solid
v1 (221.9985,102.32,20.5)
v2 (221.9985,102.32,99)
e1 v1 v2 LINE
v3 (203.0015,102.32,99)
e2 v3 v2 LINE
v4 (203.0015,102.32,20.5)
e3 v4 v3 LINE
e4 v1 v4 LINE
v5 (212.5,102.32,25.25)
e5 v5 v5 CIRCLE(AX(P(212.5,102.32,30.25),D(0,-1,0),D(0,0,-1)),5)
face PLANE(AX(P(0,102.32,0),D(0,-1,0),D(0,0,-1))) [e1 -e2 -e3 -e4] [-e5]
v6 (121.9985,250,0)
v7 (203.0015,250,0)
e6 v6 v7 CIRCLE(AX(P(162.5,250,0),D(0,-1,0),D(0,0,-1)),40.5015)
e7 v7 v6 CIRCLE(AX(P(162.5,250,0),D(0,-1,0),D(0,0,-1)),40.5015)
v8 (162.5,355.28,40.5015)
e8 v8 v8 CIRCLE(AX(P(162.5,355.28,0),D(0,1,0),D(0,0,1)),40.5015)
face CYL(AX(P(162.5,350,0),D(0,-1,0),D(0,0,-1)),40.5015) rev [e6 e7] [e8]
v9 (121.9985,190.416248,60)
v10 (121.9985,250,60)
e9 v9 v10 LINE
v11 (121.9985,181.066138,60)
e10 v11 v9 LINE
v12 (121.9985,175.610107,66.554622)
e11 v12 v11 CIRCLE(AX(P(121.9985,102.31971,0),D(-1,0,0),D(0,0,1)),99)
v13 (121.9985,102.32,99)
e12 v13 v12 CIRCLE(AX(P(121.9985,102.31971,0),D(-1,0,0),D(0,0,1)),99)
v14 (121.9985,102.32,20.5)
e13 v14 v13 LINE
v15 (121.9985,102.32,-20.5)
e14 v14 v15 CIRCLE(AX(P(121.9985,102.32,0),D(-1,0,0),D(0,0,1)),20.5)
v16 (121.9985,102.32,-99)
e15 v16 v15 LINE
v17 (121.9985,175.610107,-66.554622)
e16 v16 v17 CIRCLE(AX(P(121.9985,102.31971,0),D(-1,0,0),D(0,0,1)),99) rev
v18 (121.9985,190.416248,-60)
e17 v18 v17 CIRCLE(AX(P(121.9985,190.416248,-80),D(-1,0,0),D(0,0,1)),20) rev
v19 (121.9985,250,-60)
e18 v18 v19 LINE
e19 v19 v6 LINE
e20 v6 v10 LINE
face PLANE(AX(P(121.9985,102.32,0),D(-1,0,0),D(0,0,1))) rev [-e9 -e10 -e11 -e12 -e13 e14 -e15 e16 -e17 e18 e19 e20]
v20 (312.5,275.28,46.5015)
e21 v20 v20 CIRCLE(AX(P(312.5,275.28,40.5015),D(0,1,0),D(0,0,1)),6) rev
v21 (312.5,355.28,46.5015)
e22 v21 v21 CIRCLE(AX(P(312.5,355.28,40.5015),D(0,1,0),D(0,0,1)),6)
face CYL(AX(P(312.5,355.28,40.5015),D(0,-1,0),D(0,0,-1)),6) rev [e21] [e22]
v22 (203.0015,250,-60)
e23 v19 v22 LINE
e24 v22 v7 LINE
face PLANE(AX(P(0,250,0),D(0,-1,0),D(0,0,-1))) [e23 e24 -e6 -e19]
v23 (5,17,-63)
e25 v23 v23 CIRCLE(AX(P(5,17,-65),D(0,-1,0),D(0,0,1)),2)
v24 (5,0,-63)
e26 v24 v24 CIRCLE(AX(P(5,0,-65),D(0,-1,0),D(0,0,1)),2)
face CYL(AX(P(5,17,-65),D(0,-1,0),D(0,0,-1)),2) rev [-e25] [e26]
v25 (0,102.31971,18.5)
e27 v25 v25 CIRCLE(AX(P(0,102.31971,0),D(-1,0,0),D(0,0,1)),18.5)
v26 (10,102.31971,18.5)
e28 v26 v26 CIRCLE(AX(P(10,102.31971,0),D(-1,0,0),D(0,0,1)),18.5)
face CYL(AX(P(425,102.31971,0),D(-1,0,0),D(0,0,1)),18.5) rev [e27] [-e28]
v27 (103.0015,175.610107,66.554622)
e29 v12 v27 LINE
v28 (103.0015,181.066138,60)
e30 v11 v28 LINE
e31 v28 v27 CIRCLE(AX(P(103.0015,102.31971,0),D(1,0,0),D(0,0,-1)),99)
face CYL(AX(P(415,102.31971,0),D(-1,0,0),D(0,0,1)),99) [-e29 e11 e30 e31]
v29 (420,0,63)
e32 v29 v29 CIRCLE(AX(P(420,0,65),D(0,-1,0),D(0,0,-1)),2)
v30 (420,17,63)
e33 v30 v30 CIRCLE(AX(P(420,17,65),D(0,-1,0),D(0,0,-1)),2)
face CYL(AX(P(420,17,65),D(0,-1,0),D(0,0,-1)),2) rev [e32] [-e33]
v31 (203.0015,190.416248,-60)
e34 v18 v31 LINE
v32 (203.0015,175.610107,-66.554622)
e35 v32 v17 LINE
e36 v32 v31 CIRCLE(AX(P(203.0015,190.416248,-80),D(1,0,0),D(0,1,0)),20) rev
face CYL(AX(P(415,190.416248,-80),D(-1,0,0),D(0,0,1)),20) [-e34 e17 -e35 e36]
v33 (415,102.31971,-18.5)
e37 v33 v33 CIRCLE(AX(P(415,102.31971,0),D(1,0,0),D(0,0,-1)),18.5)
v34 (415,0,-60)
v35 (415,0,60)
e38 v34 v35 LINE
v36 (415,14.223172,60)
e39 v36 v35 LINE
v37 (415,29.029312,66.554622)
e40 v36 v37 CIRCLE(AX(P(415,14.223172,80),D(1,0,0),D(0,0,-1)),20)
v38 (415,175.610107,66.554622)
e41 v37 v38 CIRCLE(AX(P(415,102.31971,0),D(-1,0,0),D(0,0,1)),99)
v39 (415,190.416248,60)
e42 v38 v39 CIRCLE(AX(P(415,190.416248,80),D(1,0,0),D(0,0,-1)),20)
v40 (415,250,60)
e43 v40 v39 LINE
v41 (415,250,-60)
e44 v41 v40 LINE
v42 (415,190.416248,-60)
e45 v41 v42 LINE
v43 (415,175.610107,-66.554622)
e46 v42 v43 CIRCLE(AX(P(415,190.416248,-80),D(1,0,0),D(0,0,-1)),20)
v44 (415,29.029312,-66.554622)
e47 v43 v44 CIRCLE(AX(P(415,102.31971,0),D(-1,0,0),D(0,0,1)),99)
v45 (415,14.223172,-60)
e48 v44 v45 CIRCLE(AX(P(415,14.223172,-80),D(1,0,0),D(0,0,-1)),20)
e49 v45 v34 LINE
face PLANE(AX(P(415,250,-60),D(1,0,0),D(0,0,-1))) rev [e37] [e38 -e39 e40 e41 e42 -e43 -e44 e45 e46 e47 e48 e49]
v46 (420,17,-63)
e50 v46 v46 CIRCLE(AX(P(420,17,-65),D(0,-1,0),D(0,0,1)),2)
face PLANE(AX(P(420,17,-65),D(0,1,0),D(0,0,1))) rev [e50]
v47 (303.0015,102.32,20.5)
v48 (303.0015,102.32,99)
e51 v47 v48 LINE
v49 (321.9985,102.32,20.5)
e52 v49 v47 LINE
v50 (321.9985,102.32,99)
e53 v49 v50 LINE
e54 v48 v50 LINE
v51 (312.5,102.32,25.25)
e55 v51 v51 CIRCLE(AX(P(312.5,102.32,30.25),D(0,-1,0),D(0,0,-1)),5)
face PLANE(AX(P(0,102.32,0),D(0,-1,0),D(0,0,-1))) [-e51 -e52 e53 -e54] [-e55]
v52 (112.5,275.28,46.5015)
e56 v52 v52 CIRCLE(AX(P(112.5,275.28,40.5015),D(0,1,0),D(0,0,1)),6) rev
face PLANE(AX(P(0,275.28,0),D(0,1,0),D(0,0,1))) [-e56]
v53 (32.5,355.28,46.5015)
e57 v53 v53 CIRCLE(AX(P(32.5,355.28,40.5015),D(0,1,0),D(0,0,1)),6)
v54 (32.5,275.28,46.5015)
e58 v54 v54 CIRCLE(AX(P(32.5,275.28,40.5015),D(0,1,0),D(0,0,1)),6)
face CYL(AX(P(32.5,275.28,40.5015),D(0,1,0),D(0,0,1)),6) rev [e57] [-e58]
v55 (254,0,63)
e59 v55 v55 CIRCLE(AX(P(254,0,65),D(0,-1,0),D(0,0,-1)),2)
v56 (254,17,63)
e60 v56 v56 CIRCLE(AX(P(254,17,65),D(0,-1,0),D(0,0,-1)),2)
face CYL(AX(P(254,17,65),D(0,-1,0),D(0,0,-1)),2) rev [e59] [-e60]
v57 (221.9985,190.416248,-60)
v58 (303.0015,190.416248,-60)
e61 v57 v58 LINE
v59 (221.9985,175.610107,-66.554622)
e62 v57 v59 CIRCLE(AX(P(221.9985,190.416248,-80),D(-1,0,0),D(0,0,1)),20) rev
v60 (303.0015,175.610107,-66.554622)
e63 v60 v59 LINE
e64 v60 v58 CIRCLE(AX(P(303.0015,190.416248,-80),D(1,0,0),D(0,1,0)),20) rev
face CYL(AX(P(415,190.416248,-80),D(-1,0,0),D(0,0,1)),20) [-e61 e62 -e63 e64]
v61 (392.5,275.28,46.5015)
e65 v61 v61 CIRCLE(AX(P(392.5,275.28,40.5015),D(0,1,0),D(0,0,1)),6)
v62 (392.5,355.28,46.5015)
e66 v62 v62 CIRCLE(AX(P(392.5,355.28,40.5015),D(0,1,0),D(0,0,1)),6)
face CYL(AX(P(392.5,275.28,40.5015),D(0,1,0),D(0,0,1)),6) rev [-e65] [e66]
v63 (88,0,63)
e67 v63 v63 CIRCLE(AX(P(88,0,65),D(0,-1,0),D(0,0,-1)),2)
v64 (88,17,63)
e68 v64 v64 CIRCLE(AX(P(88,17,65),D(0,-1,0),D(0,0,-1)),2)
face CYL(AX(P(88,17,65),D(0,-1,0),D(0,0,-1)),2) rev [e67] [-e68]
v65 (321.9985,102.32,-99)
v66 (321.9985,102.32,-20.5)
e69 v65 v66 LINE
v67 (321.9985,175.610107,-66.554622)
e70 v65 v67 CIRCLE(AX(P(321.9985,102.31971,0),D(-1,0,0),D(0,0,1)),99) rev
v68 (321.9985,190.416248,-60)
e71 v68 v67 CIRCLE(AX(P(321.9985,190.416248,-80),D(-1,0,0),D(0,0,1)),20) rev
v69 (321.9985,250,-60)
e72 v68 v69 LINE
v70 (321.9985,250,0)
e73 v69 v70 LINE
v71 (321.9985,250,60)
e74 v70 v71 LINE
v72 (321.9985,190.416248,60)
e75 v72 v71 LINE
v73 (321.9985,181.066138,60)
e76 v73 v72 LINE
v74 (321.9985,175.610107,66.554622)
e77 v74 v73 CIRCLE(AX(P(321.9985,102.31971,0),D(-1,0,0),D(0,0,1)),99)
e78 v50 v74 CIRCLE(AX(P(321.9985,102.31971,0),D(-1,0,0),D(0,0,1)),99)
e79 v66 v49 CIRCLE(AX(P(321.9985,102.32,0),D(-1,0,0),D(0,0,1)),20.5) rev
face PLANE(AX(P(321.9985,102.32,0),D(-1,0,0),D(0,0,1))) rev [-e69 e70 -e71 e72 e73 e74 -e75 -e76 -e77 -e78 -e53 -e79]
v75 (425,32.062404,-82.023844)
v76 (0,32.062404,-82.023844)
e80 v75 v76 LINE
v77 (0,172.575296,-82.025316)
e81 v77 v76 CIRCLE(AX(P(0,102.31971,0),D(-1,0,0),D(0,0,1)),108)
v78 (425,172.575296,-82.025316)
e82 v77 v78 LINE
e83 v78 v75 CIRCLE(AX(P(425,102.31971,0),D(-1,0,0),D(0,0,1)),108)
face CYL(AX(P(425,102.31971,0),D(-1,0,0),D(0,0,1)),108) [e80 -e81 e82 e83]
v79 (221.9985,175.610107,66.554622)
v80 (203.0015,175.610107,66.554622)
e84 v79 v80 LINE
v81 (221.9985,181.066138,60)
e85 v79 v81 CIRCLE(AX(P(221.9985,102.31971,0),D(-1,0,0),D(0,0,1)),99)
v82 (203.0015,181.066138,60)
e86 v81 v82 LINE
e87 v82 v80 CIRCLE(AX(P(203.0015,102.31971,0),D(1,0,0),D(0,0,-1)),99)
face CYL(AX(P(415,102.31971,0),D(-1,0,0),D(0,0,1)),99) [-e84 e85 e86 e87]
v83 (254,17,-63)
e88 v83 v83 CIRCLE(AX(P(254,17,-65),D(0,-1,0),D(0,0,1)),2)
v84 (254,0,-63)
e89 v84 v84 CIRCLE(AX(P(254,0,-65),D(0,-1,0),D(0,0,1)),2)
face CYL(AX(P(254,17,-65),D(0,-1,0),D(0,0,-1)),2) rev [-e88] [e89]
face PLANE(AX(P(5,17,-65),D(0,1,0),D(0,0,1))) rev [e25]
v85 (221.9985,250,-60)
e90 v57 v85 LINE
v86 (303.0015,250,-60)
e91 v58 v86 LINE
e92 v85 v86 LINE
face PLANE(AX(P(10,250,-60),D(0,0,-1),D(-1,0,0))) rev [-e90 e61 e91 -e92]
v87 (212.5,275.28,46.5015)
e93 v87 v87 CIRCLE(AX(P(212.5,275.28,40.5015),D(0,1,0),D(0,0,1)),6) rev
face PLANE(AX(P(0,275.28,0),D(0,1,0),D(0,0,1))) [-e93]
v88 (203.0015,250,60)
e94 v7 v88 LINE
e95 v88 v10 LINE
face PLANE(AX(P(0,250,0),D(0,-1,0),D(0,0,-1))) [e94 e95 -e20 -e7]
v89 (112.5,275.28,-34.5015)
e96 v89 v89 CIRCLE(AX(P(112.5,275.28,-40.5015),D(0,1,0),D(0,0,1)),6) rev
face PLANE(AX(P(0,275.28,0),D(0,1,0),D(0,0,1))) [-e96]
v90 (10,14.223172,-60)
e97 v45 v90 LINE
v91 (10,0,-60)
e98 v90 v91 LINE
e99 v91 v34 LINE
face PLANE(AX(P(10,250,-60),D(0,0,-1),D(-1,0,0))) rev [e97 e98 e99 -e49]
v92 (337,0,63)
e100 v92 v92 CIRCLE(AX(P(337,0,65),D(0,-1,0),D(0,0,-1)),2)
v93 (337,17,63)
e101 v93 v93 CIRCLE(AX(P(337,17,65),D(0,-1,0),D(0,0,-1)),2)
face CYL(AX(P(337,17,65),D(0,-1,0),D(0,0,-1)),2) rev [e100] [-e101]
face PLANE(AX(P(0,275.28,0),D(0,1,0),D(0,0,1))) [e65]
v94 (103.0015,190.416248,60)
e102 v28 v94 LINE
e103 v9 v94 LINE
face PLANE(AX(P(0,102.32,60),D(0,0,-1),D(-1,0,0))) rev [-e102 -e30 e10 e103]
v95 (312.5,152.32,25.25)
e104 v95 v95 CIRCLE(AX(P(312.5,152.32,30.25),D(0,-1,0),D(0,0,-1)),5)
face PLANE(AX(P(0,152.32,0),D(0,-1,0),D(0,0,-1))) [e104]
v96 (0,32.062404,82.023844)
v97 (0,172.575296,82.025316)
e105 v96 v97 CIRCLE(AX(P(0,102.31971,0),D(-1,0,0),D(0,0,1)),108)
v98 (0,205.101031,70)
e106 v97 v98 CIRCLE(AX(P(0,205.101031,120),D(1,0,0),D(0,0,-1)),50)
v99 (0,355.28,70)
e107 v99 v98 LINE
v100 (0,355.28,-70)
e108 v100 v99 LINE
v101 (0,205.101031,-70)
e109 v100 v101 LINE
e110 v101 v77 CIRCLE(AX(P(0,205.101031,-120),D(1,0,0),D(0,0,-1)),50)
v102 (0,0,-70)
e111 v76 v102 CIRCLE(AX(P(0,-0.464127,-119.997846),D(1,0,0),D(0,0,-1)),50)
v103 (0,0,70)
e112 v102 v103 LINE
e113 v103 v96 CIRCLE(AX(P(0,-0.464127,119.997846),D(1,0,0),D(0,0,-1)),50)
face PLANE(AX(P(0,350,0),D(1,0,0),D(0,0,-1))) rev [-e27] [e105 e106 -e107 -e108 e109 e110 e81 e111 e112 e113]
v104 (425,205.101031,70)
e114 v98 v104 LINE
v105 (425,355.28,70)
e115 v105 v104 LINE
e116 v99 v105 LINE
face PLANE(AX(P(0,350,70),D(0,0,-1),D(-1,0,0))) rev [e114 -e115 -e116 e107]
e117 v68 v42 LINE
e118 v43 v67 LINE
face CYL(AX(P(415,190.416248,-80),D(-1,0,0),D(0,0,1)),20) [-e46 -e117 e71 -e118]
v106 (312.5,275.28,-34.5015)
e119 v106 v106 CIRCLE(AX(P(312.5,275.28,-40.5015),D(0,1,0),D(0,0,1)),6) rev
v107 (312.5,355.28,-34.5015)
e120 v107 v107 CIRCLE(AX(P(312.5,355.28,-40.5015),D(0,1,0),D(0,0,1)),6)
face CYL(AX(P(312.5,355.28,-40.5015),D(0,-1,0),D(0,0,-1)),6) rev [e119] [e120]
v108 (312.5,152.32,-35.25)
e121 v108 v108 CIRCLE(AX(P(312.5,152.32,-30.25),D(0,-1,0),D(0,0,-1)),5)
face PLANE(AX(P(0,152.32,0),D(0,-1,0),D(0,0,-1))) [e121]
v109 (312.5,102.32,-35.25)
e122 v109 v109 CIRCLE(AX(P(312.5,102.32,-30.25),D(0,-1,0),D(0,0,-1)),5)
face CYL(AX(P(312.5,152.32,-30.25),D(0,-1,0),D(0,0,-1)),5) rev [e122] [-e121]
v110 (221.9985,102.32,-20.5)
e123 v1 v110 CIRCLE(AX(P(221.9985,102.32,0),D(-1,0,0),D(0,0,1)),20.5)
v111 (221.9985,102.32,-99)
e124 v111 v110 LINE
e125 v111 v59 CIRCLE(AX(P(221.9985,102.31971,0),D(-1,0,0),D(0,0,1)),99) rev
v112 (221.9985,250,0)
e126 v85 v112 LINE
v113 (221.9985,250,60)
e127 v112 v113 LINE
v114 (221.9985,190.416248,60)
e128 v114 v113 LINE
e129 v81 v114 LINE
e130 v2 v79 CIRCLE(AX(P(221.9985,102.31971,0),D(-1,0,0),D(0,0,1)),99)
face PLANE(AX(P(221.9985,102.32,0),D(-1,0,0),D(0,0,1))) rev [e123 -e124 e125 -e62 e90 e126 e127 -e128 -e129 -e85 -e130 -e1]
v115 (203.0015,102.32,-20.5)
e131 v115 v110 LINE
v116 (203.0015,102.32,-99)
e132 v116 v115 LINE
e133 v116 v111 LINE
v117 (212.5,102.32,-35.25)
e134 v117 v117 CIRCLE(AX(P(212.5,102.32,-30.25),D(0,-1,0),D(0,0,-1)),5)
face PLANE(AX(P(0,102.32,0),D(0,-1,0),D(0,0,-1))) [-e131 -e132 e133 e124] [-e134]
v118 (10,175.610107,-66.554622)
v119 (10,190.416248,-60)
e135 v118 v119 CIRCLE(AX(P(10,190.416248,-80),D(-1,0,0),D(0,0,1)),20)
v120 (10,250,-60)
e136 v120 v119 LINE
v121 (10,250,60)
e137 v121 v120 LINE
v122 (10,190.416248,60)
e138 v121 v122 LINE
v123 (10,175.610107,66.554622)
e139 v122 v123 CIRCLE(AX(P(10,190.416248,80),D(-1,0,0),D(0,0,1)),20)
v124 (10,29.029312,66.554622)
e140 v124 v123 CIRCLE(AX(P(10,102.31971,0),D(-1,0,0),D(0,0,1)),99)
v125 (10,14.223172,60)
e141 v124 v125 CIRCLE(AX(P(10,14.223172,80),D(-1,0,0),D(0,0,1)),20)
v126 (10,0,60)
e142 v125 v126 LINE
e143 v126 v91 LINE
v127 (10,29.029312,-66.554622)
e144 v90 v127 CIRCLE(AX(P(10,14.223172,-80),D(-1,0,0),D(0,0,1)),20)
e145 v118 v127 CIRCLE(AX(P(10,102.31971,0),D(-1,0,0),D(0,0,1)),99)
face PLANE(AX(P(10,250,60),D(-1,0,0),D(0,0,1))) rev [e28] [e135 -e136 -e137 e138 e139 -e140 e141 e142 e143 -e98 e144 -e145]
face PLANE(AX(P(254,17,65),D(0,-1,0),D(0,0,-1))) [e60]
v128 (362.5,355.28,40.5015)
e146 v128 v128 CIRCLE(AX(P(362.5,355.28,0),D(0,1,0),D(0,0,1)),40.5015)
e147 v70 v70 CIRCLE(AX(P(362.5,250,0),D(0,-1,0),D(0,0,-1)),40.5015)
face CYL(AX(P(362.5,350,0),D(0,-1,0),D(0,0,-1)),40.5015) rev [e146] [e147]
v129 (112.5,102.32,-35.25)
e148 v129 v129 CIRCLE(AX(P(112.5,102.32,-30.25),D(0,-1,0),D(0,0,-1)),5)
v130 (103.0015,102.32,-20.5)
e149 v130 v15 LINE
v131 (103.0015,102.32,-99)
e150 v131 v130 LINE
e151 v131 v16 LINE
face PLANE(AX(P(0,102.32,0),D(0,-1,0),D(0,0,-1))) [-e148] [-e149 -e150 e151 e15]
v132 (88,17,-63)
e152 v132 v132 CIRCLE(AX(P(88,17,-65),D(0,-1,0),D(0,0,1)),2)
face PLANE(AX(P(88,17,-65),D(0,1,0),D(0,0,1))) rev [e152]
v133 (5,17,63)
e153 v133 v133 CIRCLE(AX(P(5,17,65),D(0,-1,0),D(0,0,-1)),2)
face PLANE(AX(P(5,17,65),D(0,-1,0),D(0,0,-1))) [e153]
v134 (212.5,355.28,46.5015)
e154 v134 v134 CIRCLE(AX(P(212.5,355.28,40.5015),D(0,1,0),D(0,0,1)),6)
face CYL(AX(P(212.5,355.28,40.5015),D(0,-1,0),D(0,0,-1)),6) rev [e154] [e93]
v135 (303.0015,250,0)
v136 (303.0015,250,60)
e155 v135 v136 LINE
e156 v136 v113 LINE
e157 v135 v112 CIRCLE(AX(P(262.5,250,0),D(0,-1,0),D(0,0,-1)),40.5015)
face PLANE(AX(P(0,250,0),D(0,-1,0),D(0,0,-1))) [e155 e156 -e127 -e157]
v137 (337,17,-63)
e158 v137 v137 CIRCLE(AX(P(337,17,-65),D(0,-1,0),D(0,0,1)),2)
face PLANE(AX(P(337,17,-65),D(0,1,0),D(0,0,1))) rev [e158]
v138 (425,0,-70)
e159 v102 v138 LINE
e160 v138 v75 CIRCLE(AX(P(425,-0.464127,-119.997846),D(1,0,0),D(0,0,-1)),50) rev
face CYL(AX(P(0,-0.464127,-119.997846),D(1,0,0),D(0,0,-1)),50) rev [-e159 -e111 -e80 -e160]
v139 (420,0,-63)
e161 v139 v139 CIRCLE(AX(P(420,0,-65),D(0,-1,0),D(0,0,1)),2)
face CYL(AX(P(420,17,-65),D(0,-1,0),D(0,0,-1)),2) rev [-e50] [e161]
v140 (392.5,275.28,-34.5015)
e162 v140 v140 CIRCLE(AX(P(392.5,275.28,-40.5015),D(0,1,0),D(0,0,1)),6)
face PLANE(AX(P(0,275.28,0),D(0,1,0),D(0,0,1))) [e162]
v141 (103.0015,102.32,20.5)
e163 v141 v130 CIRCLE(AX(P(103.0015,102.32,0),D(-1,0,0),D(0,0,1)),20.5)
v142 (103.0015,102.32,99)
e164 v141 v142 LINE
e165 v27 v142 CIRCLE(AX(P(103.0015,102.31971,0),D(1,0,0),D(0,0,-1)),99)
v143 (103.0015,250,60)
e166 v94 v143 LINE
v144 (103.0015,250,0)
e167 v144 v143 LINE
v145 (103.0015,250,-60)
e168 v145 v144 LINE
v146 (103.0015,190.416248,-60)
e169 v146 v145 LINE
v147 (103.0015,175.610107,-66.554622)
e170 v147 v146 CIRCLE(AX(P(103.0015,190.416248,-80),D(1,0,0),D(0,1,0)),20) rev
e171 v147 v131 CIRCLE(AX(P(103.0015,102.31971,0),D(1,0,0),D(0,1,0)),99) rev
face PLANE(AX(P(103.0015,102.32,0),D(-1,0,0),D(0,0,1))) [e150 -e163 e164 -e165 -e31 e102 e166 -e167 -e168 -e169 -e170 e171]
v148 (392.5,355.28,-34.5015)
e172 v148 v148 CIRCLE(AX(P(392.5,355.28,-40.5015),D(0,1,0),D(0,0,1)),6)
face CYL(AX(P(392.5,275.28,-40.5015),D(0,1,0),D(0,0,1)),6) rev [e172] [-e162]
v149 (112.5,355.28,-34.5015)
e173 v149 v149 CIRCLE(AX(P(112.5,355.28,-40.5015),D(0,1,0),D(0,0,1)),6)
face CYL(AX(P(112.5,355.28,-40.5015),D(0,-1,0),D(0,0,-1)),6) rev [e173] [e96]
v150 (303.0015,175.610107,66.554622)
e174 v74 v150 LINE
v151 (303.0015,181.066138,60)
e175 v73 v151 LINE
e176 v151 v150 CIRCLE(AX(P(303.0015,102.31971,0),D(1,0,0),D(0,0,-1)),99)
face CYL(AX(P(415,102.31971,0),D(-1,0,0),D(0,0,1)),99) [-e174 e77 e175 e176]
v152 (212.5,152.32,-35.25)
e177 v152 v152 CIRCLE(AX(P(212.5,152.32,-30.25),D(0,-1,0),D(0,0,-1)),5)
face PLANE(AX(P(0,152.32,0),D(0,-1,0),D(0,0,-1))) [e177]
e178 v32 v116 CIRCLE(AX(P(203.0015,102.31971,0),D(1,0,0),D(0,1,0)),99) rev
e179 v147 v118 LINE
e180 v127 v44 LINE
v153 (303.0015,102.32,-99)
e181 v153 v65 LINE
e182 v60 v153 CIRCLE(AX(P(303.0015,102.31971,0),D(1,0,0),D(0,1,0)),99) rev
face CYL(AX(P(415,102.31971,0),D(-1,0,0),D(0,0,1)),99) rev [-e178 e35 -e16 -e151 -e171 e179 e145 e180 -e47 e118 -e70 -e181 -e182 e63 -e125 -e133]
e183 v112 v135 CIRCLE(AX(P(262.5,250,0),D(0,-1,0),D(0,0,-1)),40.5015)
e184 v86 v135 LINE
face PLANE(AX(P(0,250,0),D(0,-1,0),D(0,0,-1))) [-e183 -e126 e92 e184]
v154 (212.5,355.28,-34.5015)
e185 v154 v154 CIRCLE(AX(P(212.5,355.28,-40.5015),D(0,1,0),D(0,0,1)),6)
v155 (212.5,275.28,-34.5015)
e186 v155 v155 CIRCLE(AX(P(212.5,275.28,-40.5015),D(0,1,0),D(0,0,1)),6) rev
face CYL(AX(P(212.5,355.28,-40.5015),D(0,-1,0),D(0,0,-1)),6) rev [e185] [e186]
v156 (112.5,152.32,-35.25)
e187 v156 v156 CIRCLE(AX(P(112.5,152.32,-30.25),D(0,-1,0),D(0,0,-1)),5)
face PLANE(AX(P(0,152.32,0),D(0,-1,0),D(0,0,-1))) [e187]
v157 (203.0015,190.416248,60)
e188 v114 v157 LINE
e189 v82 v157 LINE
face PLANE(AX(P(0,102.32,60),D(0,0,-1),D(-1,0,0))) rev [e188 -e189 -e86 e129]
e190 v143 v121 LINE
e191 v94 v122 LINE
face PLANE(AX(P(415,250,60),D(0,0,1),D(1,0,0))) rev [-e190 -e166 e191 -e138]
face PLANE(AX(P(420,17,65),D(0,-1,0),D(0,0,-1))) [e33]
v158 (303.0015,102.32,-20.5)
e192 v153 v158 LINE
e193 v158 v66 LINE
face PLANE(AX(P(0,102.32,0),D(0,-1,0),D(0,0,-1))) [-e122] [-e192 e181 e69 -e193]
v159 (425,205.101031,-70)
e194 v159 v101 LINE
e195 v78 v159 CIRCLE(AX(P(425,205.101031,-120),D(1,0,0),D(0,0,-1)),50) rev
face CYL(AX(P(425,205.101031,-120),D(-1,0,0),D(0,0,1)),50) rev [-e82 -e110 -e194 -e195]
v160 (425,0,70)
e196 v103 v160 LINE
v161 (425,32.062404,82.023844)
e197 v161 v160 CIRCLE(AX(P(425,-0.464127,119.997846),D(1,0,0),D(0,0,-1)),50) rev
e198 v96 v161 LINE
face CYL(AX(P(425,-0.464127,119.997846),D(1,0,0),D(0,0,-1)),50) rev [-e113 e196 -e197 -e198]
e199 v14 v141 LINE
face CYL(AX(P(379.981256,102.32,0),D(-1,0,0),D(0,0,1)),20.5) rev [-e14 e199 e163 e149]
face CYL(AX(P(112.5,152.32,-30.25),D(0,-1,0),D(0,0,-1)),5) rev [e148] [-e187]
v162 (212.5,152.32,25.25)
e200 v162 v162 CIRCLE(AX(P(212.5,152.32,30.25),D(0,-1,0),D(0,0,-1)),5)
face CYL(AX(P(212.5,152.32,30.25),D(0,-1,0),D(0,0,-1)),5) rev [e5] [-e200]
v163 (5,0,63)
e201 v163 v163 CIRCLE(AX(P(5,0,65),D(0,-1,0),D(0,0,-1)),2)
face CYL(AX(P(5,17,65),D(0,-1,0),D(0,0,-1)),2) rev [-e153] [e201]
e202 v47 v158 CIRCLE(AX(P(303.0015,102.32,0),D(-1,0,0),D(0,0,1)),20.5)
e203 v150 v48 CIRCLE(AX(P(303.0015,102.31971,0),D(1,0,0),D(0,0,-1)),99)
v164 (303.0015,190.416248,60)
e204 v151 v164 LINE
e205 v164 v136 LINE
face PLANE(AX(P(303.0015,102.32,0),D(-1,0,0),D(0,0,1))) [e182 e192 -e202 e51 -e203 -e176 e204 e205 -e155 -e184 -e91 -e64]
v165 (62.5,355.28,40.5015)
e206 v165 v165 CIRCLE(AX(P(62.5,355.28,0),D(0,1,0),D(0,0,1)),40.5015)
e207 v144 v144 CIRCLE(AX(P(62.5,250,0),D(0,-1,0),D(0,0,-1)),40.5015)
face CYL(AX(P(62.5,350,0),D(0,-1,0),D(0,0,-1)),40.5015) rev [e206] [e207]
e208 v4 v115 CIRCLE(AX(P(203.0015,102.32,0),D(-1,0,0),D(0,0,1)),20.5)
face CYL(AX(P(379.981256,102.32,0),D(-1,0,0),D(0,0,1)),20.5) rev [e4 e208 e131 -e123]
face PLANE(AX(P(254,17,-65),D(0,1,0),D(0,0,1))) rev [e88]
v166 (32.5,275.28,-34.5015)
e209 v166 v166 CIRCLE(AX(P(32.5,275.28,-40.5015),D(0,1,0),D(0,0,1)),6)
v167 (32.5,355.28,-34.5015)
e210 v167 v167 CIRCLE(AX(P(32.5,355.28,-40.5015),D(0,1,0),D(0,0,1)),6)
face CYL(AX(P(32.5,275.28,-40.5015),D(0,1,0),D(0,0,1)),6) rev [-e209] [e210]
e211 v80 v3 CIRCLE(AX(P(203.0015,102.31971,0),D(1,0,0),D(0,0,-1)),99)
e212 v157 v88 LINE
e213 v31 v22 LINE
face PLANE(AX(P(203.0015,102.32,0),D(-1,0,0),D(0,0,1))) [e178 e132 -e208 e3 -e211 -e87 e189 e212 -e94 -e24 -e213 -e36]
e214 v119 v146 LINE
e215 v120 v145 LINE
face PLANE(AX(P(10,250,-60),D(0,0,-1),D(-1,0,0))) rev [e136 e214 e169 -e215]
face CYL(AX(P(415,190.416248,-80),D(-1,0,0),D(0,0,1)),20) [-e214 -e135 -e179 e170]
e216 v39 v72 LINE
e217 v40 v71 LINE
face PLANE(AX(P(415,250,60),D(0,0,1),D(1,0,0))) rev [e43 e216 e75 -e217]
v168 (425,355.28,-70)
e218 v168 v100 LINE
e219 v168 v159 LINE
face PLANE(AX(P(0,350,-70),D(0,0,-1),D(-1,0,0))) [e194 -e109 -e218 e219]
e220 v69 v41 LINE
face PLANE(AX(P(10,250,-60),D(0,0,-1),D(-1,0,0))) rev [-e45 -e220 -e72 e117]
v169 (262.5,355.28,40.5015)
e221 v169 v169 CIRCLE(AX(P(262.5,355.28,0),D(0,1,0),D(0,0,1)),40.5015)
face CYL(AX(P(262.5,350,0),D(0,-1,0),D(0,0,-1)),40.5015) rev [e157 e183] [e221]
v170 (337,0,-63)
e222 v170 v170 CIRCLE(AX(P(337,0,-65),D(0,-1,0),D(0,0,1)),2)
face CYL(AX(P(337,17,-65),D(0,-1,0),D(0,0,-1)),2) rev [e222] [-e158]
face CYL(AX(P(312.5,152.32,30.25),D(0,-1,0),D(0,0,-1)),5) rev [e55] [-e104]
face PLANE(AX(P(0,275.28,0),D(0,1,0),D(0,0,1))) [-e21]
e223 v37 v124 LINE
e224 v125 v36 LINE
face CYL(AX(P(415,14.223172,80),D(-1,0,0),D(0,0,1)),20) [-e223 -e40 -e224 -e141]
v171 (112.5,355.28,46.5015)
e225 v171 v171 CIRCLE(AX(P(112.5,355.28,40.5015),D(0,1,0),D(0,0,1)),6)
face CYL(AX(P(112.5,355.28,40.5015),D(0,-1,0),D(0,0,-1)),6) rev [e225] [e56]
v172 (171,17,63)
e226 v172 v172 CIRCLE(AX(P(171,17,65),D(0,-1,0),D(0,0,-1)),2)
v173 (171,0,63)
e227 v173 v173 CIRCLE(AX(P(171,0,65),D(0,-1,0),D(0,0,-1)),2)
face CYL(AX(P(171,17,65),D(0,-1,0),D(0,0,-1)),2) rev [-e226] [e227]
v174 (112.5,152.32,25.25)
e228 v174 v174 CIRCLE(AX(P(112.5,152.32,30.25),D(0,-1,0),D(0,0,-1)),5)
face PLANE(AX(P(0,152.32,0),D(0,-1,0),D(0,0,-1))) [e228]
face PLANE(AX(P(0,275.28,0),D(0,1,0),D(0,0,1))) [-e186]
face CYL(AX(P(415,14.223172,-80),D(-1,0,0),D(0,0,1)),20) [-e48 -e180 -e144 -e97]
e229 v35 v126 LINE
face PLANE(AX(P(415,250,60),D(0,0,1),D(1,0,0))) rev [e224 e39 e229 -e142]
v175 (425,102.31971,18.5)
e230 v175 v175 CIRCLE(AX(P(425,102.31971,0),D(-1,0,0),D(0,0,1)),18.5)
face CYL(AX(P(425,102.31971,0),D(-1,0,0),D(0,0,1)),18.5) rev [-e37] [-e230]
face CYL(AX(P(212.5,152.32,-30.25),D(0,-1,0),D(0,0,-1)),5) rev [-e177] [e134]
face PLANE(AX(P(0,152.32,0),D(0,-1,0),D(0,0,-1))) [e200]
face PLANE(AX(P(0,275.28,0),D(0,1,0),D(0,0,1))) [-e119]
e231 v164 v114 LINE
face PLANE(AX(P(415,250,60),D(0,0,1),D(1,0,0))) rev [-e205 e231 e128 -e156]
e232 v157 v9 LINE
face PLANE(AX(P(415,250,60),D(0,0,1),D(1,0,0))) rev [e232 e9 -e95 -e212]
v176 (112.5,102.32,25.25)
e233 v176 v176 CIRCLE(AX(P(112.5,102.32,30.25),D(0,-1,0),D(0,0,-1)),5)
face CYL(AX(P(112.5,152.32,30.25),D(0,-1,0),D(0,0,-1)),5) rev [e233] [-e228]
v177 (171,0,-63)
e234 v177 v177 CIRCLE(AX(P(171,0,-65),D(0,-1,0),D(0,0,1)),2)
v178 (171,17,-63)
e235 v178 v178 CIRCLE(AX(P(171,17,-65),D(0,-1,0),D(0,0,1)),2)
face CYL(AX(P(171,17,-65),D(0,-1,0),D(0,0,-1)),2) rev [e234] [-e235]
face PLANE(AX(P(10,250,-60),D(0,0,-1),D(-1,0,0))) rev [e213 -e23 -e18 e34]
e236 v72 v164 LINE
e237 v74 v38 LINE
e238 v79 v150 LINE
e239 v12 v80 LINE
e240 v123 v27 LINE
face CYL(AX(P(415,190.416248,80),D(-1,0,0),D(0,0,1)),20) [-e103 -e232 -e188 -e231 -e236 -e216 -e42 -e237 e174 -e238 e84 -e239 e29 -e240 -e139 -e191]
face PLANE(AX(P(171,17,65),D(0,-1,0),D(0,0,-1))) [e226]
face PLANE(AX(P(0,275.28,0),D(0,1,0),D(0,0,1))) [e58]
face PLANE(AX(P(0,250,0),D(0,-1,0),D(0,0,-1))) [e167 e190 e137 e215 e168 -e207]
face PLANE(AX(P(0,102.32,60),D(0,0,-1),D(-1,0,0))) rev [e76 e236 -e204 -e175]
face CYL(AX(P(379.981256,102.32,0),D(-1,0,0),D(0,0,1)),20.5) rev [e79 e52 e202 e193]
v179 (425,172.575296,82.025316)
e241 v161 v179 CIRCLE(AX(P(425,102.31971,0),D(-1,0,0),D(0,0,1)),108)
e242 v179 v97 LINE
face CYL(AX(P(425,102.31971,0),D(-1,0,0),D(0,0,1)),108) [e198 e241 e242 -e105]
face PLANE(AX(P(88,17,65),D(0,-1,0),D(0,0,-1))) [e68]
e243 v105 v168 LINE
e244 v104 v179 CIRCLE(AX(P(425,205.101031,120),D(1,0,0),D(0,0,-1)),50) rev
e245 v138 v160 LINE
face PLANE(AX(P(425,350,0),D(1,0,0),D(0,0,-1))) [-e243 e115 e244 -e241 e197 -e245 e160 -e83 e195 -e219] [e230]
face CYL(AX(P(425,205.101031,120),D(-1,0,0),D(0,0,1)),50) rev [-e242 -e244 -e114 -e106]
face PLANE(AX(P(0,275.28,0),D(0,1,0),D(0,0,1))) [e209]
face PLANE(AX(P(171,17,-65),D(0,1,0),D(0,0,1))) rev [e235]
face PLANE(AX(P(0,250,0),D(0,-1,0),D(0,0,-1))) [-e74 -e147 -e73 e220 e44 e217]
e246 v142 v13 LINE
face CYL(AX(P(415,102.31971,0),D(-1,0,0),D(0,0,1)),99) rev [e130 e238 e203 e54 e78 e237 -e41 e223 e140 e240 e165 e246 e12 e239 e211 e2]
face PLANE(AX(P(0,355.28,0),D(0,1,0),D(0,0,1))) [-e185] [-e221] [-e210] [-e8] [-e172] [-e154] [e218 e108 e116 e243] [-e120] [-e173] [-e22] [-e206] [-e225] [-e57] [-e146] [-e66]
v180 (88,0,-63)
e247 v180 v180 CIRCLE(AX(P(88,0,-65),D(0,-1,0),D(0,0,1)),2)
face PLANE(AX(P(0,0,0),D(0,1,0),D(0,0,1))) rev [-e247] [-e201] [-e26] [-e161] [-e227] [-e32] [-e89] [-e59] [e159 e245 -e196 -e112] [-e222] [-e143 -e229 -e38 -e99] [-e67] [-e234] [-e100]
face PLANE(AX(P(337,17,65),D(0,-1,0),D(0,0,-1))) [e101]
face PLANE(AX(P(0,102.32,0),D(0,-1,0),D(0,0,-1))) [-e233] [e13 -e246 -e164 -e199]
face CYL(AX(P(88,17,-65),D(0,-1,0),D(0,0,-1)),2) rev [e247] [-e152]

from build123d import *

# Parameters (mm, degrees)
BOSS_EXTRUDE1_DEPTH    = 350
SKETCH2_W              = 405
SKETCH2_H              = 120
CUT_EXTRUDE1_DEPTH     = 250
SKETCH3_R              = 18.5
CUT_EXTRUDE2_DEPTH     = 425
BOSS_EXTRUDE4_DEPTH    = 425
SKETCH7_R              = 99
CUT_EXTRUDE4_DEPTH     = 405
FILLET1_R              = 20
FILLET2_R              = 50
SKETCH8_W              = 425
SKETCH8_H              = 140
SKETCH8_R              = 6
SKETCH8_R_2            = 40.5015
BOSS_EXTRUDE5_DEPTH    = 5.28
CUT_EXTRUDE5_START     = -80
CUT_EXTRUDE5_OUTLINE_R = 6
CUT_EXTRUDE5_DEPTH     = 80
BOSS_EXTRUDE8_START    = -5.28
SKETCH10_R             = 6
BOSS_EXTRUDE8_DEPTH    = 5.28
SKETCH13_W             = 18.997
SKETCH13_H             = 60
BOSS_EXTRUDE9_DEPTH    = 147.68
CUT_EXTRUDE6_REACH     = 493.499
SKETCH14_R             = 20.5
SKETCH15_R             = 5
CUT_EXTRUDE7_DEPTH     = 50
BOSS_EXTRUDE10_START   = 103.0015
BOSS_EXTRUDE10_DEPTH   = 18.997
BOSS_EXTRUDE10_START_2 = 203.0015
BOSS_EXTRUDE10_2_DEPTH = 18.997
BOSS_EXTRUDE10_START_3 = 303.0015
BOSS_EXTRUDE10_3_DEPTH = 18.997
SKETCH17_W             = 18.997
SKETCH17_H             = 88.096247543
BOSS_EXTRUDE11_DEPTH   = 78
CUT_EXTRUDE8_START     = -425
CUT_EXTRUDE8_DEPTH     = 425
SKETCH19_R             = 2
CUT_EXTRUDE9_DEPTH     = 17


# Read off the part's stored shape, not the designer's step: Cut-Extrude5, Boss-Extrude10
with BuildPart() as part:
    # Sketch1 → Boss-Extrude1 (new body)
    with BuildSketch(Plane(origin=(0, 0, 0), x_dir=(1, 0, 0), z_dir=(0, 1, 0))):
        with BuildLine():
            Line((21.9985, 0), (0, 0))
            Line((0, 0), (0, -70))
            Line((0, -70), (425, -70))
            Line((425, -70), (425, 0))
            Line((425, 0), (403.0015, 0))
            ThreePointArc((403.0015, 0), (362.5, -40.5015), (321.9985, 0))
            Line((321.9985, 0), (303.0015, 0))
            ThreePointArc((303.0015, 0), (262.5, -40.5015), (221.9985, 0))
            Line((221.9985, 0), (203.0015, 0))
            ThreePointArc((203.0015, 0), (162.5, -40.5015), (121.9985, 0))
            Line((121.9985, 0), (103.0015, 0))
            ThreePointArc((103.0015, 0), (62.5, -40.5015), (21.9985, 0))
        make_face()
        with BuildLine():
            Line((0, 70), (0, 0))
            Line((0, 0), (21.9985, 0))
            ThreePointArc((21.9985, 0), (62.5, 40.5015), (103.0015, 0))
            Line((103.0015, 0), (121.9985, 0))
            ThreePointArc((121.9985, 0), (162.5, 40.5015), (203.0015, 0))
            Line((203.0015, 0), (221.9985, 0))
            ThreePointArc((221.9985, 0), (262.5, 40.5015), (303.0015, 0))
            Line((303.0015, 0), (321.9985, 0))
            ThreePointArc((321.9985, 0), (362.5, 40.5015), (403.0015, 0))
            Line((403.0015, 0), (425, 0))
            Line((425, 0), (425, 70))
            Line((425, 70), (0, 70))
        make_face()
    extrude(amount=BOSS_EXTRUDE1_DEPTH)

    # Sketch2 → Cut-Extrude1 (cut)
    with BuildSketch(Plane.XZ):
        with Locations((212.5, 0)):
            Rectangle(SKETCH2_W, SKETCH2_H)
    extrude(amount=-CUT_EXTRUDE1_DEPTH, mode=Mode.SUBTRACT)

    # Sketch3 → Cut-Extrude2 (cut)
    with BuildSketch(Plane.ZY):
        with Locations((0, 102.319709586)):
            Circle(SKETCH3_R)
    extrude(amount=-CUT_EXTRUDE2_DEPTH, mode=Mode.SUBTRACT)

    # Sketch5 → Boss-Extrude4 (add)
    with BuildSketch(Plane.ZY):
        with BuildLine():
            Line((-70, 20.076168806), (-70, 184.563250366))
            ThreePointArc((-70, 184.563250366), (-108, 102.319709586), (-70, 20.076168806))
        make_face()
        with BuildLine():
            ThreePointArc((70, 20.076168806), (108, 102.319709586), (70, 184.563250366))
            Line((70, 184.563250366), (70, 20.076168806))
        make_face()
    extrude(amount=-BOSS_EXTRUDE4_DEPTH)

    # Sketch7 → Cut-Extrude4 (cut)
    with BuildSketch(Plane.ZY.offset(-10)):
        with Locations((0, 102.319709586)):
            Circle(SKETCH7_R)
    extrude(amount=-CUT_EXTRUDE4_DEPTH, mode=Mode.SUBTRACT)

    # Fillet1
    fillet1_edges = [part.edges().sort_by_distance(p)[0] for p in [
        (212.5, 23.573281096, -60),
        (212.5, 181.066138077, -60),
        (212.5, 181.066138077, 60),
        (212.5, 23.573281096, 60),
    ]]
    fillet(fillet1_edges, radius=FILLET1_R)

    # Fillet2
    # the kernel refuses this fillet: 50 mm, written as the material it adds along each edge
    with BuildSketch(Plane(origin=(0, 184.563250366, -70), x_dir=(0, -0.7060057358717271, -0.7082061147125328), z_dir=(1, 0, 0))) as fillet2_piece_1:
        with BuildLine():
            CenterArc((20.910514914, 49.845268512), FILLET2_R, 224.9108533, 40.580418656)
            Line((-14.499790821, 14.544981719), (-15.207996936, 13.838975983))
            Line((-15.207996936, 13.838975983), (-0.708206115, -0.706005736))
            Line((-0.708206115, -0.706005736), (0.078610958, -0.99690537))
            ThreePointArc((0.078610958, -0.99690537), (8.489983499, -0.665779987), (16.90135604, -0.99690537))
            Line((16.90135604, -0.99690537), (16.979966998, 0))
        make_face()
    extrude(amount=425)
    with BuildSketch(Plane(origin=(0, 20.076168806, -70), x_dir=(0, -1, 0), z_dir=(1, 0, 0))) as fillet2_piece_2:
        with BuildLine():
            CenterArc((20.540295494, 49.997845818), FILLET2_R, 229.418380503, 40.049761852)
            Line((-11.986234973, 12.023843977), (-12.636765582, 11.26436394))
            ThreePointArc((-12.636765582, 11.26436394), (-6.464694875, 5.541819632), (-0.761514266, -0.648148148))
            Line((-0.761514266, -0.648148148), (0, -1))
            ThreePointArc((0, -1), (10.038084403, -1), (20.066886273, -0.999956916))
            Line((20.066886273, -0.999956916), (20.076168806, 0))
        make_face()
    extrude(amount=425)
    with BuildSketch(Plane(origin=(0, 20.076168806, 70), x_dir=(0, -1, 0), z_dir=(1, 0, 0))) as fillet2_piece_3:
        with BuildLine():
            CenterArc((20.540295494, -49.997845818), FILLET2_R, 90.531857645, 40.049761852)
            Line((-11.986234973, -12.023843977), (-12.636765582, -11.26436394))
            ThreePointArc((-12.636765582, -11.26436394), (-6.464694875, -5.541819632), (-0.761514266, 0.648148148))
            Line((-0.761514266, 0.648148148), (0, 1))
            ThreePointArc((0, 1), (10.038084403, 1), (20.066886273, 0.999956916))
            Line((20.066886273, 0.999956916), (20.076168806, 0))
        make_face()
    extrude(amount=425)
    with BuildSketch(Plane(origin=(0, 184.563250366, 70), x_dir=(0, 1, 0), z_dir=(1, 0, 0))) as fillet2_piece_4:
        with BuildLine():
            CenterArc((20.53778048, 50), FILLET2_R, 229.419581344, 40.580418656)
            Line((-11.987954096, 12.025316456), (-12.638468787, 11.265822785))
            ThreePointArc((-12.638468787, 11.265822785), (-6.465486506, 5.542613738), (-0.761514266, -0.648148148))
            Line((-0.761514266, -0.648148148), (0, -1))
            Line((0, -1), (20.53778048, -1))
            Line((20.53778048, -1), (20.53778048, 0))
        make_face()
    extrude(amount=425)

    # Sketch8 → Boss-Extrude5 (add)
    with BuildSketch(Plane(origin=(0, 350, 0), x_dir=(1, 0, 0), z_dir=(0, 1, 0))):
        with Locations((212.5, 0)):
            Rectangle(SKETCH8_W, SKETCH8_H)
        with Locations(Location((112.5, 40.5015, 0), (0, 0, 270))):
            Circle(SKETCH8_R, mode=Mode.SUBTRACT)
        with Locations(Location((112.5, -40.5015, 0), (0, 0, 270))):
            Circle(SKETCH8_R, mode=Mode.SUBTRACT)
        with Locations(Location((212.5, -40.5015, 0), (0, 0, 270))):
            Circle(SKETCH8_R, mode=Mode.SUBTRACT)
        with Locations(Location((212.5, 40.5015, 0), (0, 0, 270))):
            Circle(SKETCH8_R, mode=Mode.SUBTRACT)
        with Locations(Location((312.5, -40.5015, 0), (0, 0, 270))):
            Circle(SKETCH8_R, mode=Mode.SUBTRACT)
        with Locations(Location((312.5, 40.5015, 0), (0, 0, 270))):
            Circle(SKETCH8_R, mode=Mode.SUBTRACT)
        with Locations(Location((12.5, 40.5015, 0), (0, 0, 270))):
            Circle(SKETCH8_R, mode=Mode.SUBTRACT)
        with Locations(Location((12.5, -40.5015, 0), (0, 0, 270))):
            Circle(SKETCH8_R, mode=Mode.SUBTRACT)
        with Locations(Location((412.5, -40.5015, 0), (0, 0, 270))):
            Circle(SKETCH8_R, mode=Mode.SUBTRACT)
        with Locations(Location((412.5, 40.5015, 0), (0, 0, 270))):
            Circle(SKETCH8_R, mode=Mode.SUBTRACT)
        with Locations(Location((62.5, 0, 0), (0, 0, 90))):
            Circle(SKETCH8_R_2, mode=Mode.SUBTRACT)
        with Locations(Location((162.5, 0, 0), (0, 0, 90))):
            Circle(SKETCH8_R_2, mode=Mode.SUBTRACT)
        with Locations(Location((262.5, 0, 0), (0, 0, 90))):
            Circle(SKETCH8_R_2, mode=Mode.SUBTRACT)
        with Locations(Location((362.5, 0, 0), (0, 0, 90))):
            Circle(SKETCH8_R_2, mode=Mode.SUBTRACT)
    extrude(amount=BOSS_EXTRUDE5_DEPTH)

    # Cut-Extrude5 outline → Cut-Extrude5 (cut)
    with BuildSketch(Plane(origin=(0, 355.28, 0), x_dir=(1, 0, 0), z_dir=(0, 1, 0)).offset(CUT_EXTRUDE5_START)):
        with Locations((112.5, 40.5015)):
            Circle(CUT_EXTRUDE5_OUTLINE_R)
        with Locations((112.5, -40.5015)):
            Circle(CUT_EXTRUDE5_OUTLINE_R)
        with Locations((212.5, -40.5015)):
            Circle(CUT_EXTRUDE5_OUTLINE_R)
        with Locations((212.5, 40.5015)):
            Circle(CUT_EXTRUDE5_OUTLINE_R)
        with Locations((312.5, -40.5015)):
            Circle(CUT_EXTRUDE5_OUTLINE_R)
        with Locations((312.5, 40.5015)):
            Circle(CUT_EXTRUDE5_OUTLINE_R)
        with Locations((32.5, 40.5015)):
            Circle(CUT_EXTRUDE5_OUTLINE_R)
        with Locations((392.5, -40.5015)):
            Circle(CUT_EXTRUDE5_OUTLINE_R)
        with Locations((32.5, -40.5015)):
            Circle(CUT_EXTRUDE5_OUTLINE_R)
        with Locations((392.5, 40.5015)):
            Circle(CUT_EXTRUDE5_OUTLINE_R)
    extrude(amount=CUT_EXTRUDE5_DEPTH, mode=Mode.SUBTRACT)

    # Sketch10 → Boss-Extrude8 (add)
    with BuildSketch(Plane(origin=(0, 355.28, 0), x_dir=(1, 0, 0), z_dir=(0, 1, 0)).offset(BOSS_EXTRUDE8_START)):
        with Locations((12.5, 40.5015)):
            Circle(SKETCH10_R)
        with Locations((12.5, -40.5015)):
            Circle(SKETCH10_R)
        with Locations((412.5, -40.5015)):
            Circle(SKETCH10_R)
        with Locations((412.5, 40.5015)):
            Circle(SKETCH10_R)
    extrude(amount=BOSS_EXTRUDE8_DEPTH)

    # Sketch13 → Boss-Extrude9 (add)
    with BuildSketch(Plane.XZ.offset(-250)):
        with Locations((112.5, 30)):
            Rectangle(SKETCH13_W, SKETCH13_H)
        with Locations((212.5, 30)):
            Rectangle(SKETCH13_W, SKETCH13_H)
        with Locations((312.5, 30)):
            Rectangle(SKETCH13_W, SKETCH13_H)
        with Locations((112.5, -30)):
            Rectangle(SKETCH13_W, SKETCH13_H)
        with Locations((212.5, -30)):
            Rectangle(SKETCH13_W, SKETCH13_H)
        with Locations((312.5, -30)):
            Rectangle(SKETCH13_W, SKETCH13_H)
    extrude(amount=BOSS_EXTRUDE9_DEPTH)

    # Cut-Extrude6: up to this face of the body (flat: up to its plane)
    cut_extrude6_end = Plane(part.part.faces().sort_by_distance((321.9985, 176.16, 0))[0])
    # Sketch14 → Cut-Extrude6 (cut, up to the picked face)
    with BuildSketch(Plane.ZY.offset(-103.0015), mode=Mode.PRIVATE) as cut_extrude6_sk1:
        with Locations((0, 102.32)):
            Circle(SKETCH14_R)
    cut_extrude6_tool1 = split(extrude(cut_extrude6_sk1.sketch, amount=-CUT_EXTRUDE6_REACH, mode=Mode.PRIVATE), bisect_by=cut_extrude6_end, keep=Keep.BOTH, mode=Mode.PRIVATE)
    add(cut_extrude6_tool1.solids().sort_by(Axis((103.0015, 102.32, 0), (1, 0, 0)))[0], mode=Mode.SUBTRACT)

    # Sketch15 → Cut-Extrude7 (cut)
    with BuildSketch(Plane.XZ.offset(-102.32)):
        with Locations(Location((112.5, -30.25, 0), (0, 0, 270))):
            Circle(SKETCH15_R)
        with Locations(Location((112.5, 30.25, 0), (0, 0, 270))):
            Circle(SKETCH15_R)
        with Locations(Location((212.5, -30.25, 0), (0, 0, 270))):
            Circle(SKETCH15_R)
        with Locations(Location((212.5, 30.25, 0), (0, 0, 270))):
            Circle(SKETCH15_R)
        with Locations(Location((312.5, 30.25, 0), (0, 0, 270))):
            Circle(SKETCH15_R)
        with Locations(Location((312.5, -30.25, 0), (0, 0, 270))):
            Circle(SKETCH15_R)
    extrude(amount=-CUT_EXTRUDE7_DEPTH, mode=Mode.SUBTRACT)

    # Boss-Extrude10 outline → Boss-Extrude10 (add)
    with BuildSketch(Plane.YZ.offset(BOSS_EXTRUDE10_START)):
        with BuildLine():
            ThreePointArc((175.61010671, 66.554621849), (142.39534883, 90.525925233), (102.32, 99))
            Line((102.32, 99), (102.32, 60))
            Line((102.32, 60), (181.066138077, 60))
            ThreePointArc((181.066138077, 60), (178.408735422, 63.336088823), (175.61010671, 66.554621849))
        make_face()
    extrude(amount=BOSS_EXTRUDE10_DEPTH)

    # Boss-Extrude10 2 outline → Boss-Extrude10 2 (add)
    with BuildSketch(Plane.YZ.offset(BOSS_EXTRUDE10_START_2)):
        with BuildLine():
            ThreePointArc((175.61010671, 66.554621849), (142.39534883, 90.525925233), (102.32, 99))
            Line((102.32, 99), (102.32, 60))
            Line((102.32, 60), (181.066138077, 60))
            ThreePointArc((181.066138077, 60), (178.408735422, 63.336088823), (175.61010671, 66.554621849))
        make_face()
    extrude(amount=BOSS_EXTRUDE10_2_DEPTH)

    # Boss-Extrude10 3 outline → Boss-Extrude10 3 (add)
    with BuildSketch(Plane.YZ.offset(BOSS_EXTRUDE10_START_3)):
        with BuildLine():
            ThreePointArc((175.61010671, 66.554621849), (142.39534883, 90.525925233), (102.32, 99))
            Line((102.32, 99), (102.32, 60))
            Line((102.32, 60), (181.066138077, 60))
            ThreePointArc((181.066138077, 60), (178.408735422, 63.336088823), (175.61010671, 66.554621849))
        make_face()
    extrude(amount=BOSS_EXTRUDE10_3_DEPTH)

    # Sketch17 → Boss-Extrude11 (add)
    with BuildSketch(Plane(origin=(0, 0, -60), x_dir=(-1, 0, 0), z_dir=(0, 0, -1))):
        with Locations((-212.5, 146.368123772)):
            Rectangle(SKETCH17_W, SKETCH17_H)
        with Locations((-112.5, 146.368123772)):
            Rectangle(SKETCH17_W, SKETCH17_H)
        with Locations((-312.5, 146.368123772)):
            Rectangle(SKETCH17_W, SKETCH17_H)
    extrude(amount=BOSS_EXTRUDE11_DEPTH)

    # Sketch18 → Cut-Extrude8 (cut)
    with BuildSketch(Plane(origin=(425, 0, 0), x_dir=(0, 0, -1), z_dir=(1, 0, 0)).offset(CUT_EXTRUDE8_START)):
        with BuildLine():
            ThreePointArc((127.592646186, -6.969432781), (167.999999991, 102.317949061), (127.594936709, 211.606177762))
            Line((127.594936709, 211.606177762), (70, 211.606177762))
            Line((70, 211.606177762), (70, 205.101030846))
            ThreePointArc((70, 205.101030846), (73.102589745, 187.762261819), (82.025316456, 172.57529627))
            ThreePointArc((82.025316456, 172.57529627), (107.999999994, 102.31857782), (82.023843977, 32.062403779))
            ThreePointArc((82.023843977, 32.062403779), (73.181599395, 17.092611929), (70, 0))
            Line((70, 0), (127.592646186, -6.969432781))
        make_face()
    extrude(amount=CUT_EXTRUDE8_DEPTH, mode=Mode.SUBTRACT)

    # Sketch19 → Cut-Extrude9 (cut)
    with BuildSketch(Plane.XZ):
        with Locations(Location((5, 65, 0), (0, 0, 270))):
            Circle(SKETCH19_R)
        with Locations(Location((88, 65, 0), (0, 0, 270))):
            Circle(SKETCH19_R)
        with Locations(Location((171, 65, 0), (0, 0, 270))):
            Circle(SKETCH19_R)
        with Locations(Location((254, 65, 0), (0, 0, 270))):
            Circle(SKETCH19_R)
        with Locations(Location((337, 65, 0), (0, 0, 270))):
            Circle(SKETCH19_R)
        with Locations(Location((420, 65, 0), (0, 0, 270))):
            Circle(SKETCH19_R)
        with Locations(Location((420, -65, 0), (0, 0, 90))):
            Circle(SKETCH19_R)
        with Locations(Location((337, -65, 0), (0, 0, 90))):
            Circle(SKETCH19_R)
        with Locations(Location((254, -65, 0), (0, 0, 90))):
            Circle(SKETCH19_R)
        with Locations(Location((171, -65, 0), (0, 0, 90))):
            Circle(SKETCH19_R)
        with Locations(Location((88, -65, 0), (0, 0, 90))):
            Circle(SKETCH19_R)
        with Locations(Location((5, -65, 0), (0, 0, 90))):
            Circle(SKETCH19_R)
    extrude(amount=-CUT_EXTRUDE9_DEPTH, mode=Mode.SUBTRACT)


solid = part.part
